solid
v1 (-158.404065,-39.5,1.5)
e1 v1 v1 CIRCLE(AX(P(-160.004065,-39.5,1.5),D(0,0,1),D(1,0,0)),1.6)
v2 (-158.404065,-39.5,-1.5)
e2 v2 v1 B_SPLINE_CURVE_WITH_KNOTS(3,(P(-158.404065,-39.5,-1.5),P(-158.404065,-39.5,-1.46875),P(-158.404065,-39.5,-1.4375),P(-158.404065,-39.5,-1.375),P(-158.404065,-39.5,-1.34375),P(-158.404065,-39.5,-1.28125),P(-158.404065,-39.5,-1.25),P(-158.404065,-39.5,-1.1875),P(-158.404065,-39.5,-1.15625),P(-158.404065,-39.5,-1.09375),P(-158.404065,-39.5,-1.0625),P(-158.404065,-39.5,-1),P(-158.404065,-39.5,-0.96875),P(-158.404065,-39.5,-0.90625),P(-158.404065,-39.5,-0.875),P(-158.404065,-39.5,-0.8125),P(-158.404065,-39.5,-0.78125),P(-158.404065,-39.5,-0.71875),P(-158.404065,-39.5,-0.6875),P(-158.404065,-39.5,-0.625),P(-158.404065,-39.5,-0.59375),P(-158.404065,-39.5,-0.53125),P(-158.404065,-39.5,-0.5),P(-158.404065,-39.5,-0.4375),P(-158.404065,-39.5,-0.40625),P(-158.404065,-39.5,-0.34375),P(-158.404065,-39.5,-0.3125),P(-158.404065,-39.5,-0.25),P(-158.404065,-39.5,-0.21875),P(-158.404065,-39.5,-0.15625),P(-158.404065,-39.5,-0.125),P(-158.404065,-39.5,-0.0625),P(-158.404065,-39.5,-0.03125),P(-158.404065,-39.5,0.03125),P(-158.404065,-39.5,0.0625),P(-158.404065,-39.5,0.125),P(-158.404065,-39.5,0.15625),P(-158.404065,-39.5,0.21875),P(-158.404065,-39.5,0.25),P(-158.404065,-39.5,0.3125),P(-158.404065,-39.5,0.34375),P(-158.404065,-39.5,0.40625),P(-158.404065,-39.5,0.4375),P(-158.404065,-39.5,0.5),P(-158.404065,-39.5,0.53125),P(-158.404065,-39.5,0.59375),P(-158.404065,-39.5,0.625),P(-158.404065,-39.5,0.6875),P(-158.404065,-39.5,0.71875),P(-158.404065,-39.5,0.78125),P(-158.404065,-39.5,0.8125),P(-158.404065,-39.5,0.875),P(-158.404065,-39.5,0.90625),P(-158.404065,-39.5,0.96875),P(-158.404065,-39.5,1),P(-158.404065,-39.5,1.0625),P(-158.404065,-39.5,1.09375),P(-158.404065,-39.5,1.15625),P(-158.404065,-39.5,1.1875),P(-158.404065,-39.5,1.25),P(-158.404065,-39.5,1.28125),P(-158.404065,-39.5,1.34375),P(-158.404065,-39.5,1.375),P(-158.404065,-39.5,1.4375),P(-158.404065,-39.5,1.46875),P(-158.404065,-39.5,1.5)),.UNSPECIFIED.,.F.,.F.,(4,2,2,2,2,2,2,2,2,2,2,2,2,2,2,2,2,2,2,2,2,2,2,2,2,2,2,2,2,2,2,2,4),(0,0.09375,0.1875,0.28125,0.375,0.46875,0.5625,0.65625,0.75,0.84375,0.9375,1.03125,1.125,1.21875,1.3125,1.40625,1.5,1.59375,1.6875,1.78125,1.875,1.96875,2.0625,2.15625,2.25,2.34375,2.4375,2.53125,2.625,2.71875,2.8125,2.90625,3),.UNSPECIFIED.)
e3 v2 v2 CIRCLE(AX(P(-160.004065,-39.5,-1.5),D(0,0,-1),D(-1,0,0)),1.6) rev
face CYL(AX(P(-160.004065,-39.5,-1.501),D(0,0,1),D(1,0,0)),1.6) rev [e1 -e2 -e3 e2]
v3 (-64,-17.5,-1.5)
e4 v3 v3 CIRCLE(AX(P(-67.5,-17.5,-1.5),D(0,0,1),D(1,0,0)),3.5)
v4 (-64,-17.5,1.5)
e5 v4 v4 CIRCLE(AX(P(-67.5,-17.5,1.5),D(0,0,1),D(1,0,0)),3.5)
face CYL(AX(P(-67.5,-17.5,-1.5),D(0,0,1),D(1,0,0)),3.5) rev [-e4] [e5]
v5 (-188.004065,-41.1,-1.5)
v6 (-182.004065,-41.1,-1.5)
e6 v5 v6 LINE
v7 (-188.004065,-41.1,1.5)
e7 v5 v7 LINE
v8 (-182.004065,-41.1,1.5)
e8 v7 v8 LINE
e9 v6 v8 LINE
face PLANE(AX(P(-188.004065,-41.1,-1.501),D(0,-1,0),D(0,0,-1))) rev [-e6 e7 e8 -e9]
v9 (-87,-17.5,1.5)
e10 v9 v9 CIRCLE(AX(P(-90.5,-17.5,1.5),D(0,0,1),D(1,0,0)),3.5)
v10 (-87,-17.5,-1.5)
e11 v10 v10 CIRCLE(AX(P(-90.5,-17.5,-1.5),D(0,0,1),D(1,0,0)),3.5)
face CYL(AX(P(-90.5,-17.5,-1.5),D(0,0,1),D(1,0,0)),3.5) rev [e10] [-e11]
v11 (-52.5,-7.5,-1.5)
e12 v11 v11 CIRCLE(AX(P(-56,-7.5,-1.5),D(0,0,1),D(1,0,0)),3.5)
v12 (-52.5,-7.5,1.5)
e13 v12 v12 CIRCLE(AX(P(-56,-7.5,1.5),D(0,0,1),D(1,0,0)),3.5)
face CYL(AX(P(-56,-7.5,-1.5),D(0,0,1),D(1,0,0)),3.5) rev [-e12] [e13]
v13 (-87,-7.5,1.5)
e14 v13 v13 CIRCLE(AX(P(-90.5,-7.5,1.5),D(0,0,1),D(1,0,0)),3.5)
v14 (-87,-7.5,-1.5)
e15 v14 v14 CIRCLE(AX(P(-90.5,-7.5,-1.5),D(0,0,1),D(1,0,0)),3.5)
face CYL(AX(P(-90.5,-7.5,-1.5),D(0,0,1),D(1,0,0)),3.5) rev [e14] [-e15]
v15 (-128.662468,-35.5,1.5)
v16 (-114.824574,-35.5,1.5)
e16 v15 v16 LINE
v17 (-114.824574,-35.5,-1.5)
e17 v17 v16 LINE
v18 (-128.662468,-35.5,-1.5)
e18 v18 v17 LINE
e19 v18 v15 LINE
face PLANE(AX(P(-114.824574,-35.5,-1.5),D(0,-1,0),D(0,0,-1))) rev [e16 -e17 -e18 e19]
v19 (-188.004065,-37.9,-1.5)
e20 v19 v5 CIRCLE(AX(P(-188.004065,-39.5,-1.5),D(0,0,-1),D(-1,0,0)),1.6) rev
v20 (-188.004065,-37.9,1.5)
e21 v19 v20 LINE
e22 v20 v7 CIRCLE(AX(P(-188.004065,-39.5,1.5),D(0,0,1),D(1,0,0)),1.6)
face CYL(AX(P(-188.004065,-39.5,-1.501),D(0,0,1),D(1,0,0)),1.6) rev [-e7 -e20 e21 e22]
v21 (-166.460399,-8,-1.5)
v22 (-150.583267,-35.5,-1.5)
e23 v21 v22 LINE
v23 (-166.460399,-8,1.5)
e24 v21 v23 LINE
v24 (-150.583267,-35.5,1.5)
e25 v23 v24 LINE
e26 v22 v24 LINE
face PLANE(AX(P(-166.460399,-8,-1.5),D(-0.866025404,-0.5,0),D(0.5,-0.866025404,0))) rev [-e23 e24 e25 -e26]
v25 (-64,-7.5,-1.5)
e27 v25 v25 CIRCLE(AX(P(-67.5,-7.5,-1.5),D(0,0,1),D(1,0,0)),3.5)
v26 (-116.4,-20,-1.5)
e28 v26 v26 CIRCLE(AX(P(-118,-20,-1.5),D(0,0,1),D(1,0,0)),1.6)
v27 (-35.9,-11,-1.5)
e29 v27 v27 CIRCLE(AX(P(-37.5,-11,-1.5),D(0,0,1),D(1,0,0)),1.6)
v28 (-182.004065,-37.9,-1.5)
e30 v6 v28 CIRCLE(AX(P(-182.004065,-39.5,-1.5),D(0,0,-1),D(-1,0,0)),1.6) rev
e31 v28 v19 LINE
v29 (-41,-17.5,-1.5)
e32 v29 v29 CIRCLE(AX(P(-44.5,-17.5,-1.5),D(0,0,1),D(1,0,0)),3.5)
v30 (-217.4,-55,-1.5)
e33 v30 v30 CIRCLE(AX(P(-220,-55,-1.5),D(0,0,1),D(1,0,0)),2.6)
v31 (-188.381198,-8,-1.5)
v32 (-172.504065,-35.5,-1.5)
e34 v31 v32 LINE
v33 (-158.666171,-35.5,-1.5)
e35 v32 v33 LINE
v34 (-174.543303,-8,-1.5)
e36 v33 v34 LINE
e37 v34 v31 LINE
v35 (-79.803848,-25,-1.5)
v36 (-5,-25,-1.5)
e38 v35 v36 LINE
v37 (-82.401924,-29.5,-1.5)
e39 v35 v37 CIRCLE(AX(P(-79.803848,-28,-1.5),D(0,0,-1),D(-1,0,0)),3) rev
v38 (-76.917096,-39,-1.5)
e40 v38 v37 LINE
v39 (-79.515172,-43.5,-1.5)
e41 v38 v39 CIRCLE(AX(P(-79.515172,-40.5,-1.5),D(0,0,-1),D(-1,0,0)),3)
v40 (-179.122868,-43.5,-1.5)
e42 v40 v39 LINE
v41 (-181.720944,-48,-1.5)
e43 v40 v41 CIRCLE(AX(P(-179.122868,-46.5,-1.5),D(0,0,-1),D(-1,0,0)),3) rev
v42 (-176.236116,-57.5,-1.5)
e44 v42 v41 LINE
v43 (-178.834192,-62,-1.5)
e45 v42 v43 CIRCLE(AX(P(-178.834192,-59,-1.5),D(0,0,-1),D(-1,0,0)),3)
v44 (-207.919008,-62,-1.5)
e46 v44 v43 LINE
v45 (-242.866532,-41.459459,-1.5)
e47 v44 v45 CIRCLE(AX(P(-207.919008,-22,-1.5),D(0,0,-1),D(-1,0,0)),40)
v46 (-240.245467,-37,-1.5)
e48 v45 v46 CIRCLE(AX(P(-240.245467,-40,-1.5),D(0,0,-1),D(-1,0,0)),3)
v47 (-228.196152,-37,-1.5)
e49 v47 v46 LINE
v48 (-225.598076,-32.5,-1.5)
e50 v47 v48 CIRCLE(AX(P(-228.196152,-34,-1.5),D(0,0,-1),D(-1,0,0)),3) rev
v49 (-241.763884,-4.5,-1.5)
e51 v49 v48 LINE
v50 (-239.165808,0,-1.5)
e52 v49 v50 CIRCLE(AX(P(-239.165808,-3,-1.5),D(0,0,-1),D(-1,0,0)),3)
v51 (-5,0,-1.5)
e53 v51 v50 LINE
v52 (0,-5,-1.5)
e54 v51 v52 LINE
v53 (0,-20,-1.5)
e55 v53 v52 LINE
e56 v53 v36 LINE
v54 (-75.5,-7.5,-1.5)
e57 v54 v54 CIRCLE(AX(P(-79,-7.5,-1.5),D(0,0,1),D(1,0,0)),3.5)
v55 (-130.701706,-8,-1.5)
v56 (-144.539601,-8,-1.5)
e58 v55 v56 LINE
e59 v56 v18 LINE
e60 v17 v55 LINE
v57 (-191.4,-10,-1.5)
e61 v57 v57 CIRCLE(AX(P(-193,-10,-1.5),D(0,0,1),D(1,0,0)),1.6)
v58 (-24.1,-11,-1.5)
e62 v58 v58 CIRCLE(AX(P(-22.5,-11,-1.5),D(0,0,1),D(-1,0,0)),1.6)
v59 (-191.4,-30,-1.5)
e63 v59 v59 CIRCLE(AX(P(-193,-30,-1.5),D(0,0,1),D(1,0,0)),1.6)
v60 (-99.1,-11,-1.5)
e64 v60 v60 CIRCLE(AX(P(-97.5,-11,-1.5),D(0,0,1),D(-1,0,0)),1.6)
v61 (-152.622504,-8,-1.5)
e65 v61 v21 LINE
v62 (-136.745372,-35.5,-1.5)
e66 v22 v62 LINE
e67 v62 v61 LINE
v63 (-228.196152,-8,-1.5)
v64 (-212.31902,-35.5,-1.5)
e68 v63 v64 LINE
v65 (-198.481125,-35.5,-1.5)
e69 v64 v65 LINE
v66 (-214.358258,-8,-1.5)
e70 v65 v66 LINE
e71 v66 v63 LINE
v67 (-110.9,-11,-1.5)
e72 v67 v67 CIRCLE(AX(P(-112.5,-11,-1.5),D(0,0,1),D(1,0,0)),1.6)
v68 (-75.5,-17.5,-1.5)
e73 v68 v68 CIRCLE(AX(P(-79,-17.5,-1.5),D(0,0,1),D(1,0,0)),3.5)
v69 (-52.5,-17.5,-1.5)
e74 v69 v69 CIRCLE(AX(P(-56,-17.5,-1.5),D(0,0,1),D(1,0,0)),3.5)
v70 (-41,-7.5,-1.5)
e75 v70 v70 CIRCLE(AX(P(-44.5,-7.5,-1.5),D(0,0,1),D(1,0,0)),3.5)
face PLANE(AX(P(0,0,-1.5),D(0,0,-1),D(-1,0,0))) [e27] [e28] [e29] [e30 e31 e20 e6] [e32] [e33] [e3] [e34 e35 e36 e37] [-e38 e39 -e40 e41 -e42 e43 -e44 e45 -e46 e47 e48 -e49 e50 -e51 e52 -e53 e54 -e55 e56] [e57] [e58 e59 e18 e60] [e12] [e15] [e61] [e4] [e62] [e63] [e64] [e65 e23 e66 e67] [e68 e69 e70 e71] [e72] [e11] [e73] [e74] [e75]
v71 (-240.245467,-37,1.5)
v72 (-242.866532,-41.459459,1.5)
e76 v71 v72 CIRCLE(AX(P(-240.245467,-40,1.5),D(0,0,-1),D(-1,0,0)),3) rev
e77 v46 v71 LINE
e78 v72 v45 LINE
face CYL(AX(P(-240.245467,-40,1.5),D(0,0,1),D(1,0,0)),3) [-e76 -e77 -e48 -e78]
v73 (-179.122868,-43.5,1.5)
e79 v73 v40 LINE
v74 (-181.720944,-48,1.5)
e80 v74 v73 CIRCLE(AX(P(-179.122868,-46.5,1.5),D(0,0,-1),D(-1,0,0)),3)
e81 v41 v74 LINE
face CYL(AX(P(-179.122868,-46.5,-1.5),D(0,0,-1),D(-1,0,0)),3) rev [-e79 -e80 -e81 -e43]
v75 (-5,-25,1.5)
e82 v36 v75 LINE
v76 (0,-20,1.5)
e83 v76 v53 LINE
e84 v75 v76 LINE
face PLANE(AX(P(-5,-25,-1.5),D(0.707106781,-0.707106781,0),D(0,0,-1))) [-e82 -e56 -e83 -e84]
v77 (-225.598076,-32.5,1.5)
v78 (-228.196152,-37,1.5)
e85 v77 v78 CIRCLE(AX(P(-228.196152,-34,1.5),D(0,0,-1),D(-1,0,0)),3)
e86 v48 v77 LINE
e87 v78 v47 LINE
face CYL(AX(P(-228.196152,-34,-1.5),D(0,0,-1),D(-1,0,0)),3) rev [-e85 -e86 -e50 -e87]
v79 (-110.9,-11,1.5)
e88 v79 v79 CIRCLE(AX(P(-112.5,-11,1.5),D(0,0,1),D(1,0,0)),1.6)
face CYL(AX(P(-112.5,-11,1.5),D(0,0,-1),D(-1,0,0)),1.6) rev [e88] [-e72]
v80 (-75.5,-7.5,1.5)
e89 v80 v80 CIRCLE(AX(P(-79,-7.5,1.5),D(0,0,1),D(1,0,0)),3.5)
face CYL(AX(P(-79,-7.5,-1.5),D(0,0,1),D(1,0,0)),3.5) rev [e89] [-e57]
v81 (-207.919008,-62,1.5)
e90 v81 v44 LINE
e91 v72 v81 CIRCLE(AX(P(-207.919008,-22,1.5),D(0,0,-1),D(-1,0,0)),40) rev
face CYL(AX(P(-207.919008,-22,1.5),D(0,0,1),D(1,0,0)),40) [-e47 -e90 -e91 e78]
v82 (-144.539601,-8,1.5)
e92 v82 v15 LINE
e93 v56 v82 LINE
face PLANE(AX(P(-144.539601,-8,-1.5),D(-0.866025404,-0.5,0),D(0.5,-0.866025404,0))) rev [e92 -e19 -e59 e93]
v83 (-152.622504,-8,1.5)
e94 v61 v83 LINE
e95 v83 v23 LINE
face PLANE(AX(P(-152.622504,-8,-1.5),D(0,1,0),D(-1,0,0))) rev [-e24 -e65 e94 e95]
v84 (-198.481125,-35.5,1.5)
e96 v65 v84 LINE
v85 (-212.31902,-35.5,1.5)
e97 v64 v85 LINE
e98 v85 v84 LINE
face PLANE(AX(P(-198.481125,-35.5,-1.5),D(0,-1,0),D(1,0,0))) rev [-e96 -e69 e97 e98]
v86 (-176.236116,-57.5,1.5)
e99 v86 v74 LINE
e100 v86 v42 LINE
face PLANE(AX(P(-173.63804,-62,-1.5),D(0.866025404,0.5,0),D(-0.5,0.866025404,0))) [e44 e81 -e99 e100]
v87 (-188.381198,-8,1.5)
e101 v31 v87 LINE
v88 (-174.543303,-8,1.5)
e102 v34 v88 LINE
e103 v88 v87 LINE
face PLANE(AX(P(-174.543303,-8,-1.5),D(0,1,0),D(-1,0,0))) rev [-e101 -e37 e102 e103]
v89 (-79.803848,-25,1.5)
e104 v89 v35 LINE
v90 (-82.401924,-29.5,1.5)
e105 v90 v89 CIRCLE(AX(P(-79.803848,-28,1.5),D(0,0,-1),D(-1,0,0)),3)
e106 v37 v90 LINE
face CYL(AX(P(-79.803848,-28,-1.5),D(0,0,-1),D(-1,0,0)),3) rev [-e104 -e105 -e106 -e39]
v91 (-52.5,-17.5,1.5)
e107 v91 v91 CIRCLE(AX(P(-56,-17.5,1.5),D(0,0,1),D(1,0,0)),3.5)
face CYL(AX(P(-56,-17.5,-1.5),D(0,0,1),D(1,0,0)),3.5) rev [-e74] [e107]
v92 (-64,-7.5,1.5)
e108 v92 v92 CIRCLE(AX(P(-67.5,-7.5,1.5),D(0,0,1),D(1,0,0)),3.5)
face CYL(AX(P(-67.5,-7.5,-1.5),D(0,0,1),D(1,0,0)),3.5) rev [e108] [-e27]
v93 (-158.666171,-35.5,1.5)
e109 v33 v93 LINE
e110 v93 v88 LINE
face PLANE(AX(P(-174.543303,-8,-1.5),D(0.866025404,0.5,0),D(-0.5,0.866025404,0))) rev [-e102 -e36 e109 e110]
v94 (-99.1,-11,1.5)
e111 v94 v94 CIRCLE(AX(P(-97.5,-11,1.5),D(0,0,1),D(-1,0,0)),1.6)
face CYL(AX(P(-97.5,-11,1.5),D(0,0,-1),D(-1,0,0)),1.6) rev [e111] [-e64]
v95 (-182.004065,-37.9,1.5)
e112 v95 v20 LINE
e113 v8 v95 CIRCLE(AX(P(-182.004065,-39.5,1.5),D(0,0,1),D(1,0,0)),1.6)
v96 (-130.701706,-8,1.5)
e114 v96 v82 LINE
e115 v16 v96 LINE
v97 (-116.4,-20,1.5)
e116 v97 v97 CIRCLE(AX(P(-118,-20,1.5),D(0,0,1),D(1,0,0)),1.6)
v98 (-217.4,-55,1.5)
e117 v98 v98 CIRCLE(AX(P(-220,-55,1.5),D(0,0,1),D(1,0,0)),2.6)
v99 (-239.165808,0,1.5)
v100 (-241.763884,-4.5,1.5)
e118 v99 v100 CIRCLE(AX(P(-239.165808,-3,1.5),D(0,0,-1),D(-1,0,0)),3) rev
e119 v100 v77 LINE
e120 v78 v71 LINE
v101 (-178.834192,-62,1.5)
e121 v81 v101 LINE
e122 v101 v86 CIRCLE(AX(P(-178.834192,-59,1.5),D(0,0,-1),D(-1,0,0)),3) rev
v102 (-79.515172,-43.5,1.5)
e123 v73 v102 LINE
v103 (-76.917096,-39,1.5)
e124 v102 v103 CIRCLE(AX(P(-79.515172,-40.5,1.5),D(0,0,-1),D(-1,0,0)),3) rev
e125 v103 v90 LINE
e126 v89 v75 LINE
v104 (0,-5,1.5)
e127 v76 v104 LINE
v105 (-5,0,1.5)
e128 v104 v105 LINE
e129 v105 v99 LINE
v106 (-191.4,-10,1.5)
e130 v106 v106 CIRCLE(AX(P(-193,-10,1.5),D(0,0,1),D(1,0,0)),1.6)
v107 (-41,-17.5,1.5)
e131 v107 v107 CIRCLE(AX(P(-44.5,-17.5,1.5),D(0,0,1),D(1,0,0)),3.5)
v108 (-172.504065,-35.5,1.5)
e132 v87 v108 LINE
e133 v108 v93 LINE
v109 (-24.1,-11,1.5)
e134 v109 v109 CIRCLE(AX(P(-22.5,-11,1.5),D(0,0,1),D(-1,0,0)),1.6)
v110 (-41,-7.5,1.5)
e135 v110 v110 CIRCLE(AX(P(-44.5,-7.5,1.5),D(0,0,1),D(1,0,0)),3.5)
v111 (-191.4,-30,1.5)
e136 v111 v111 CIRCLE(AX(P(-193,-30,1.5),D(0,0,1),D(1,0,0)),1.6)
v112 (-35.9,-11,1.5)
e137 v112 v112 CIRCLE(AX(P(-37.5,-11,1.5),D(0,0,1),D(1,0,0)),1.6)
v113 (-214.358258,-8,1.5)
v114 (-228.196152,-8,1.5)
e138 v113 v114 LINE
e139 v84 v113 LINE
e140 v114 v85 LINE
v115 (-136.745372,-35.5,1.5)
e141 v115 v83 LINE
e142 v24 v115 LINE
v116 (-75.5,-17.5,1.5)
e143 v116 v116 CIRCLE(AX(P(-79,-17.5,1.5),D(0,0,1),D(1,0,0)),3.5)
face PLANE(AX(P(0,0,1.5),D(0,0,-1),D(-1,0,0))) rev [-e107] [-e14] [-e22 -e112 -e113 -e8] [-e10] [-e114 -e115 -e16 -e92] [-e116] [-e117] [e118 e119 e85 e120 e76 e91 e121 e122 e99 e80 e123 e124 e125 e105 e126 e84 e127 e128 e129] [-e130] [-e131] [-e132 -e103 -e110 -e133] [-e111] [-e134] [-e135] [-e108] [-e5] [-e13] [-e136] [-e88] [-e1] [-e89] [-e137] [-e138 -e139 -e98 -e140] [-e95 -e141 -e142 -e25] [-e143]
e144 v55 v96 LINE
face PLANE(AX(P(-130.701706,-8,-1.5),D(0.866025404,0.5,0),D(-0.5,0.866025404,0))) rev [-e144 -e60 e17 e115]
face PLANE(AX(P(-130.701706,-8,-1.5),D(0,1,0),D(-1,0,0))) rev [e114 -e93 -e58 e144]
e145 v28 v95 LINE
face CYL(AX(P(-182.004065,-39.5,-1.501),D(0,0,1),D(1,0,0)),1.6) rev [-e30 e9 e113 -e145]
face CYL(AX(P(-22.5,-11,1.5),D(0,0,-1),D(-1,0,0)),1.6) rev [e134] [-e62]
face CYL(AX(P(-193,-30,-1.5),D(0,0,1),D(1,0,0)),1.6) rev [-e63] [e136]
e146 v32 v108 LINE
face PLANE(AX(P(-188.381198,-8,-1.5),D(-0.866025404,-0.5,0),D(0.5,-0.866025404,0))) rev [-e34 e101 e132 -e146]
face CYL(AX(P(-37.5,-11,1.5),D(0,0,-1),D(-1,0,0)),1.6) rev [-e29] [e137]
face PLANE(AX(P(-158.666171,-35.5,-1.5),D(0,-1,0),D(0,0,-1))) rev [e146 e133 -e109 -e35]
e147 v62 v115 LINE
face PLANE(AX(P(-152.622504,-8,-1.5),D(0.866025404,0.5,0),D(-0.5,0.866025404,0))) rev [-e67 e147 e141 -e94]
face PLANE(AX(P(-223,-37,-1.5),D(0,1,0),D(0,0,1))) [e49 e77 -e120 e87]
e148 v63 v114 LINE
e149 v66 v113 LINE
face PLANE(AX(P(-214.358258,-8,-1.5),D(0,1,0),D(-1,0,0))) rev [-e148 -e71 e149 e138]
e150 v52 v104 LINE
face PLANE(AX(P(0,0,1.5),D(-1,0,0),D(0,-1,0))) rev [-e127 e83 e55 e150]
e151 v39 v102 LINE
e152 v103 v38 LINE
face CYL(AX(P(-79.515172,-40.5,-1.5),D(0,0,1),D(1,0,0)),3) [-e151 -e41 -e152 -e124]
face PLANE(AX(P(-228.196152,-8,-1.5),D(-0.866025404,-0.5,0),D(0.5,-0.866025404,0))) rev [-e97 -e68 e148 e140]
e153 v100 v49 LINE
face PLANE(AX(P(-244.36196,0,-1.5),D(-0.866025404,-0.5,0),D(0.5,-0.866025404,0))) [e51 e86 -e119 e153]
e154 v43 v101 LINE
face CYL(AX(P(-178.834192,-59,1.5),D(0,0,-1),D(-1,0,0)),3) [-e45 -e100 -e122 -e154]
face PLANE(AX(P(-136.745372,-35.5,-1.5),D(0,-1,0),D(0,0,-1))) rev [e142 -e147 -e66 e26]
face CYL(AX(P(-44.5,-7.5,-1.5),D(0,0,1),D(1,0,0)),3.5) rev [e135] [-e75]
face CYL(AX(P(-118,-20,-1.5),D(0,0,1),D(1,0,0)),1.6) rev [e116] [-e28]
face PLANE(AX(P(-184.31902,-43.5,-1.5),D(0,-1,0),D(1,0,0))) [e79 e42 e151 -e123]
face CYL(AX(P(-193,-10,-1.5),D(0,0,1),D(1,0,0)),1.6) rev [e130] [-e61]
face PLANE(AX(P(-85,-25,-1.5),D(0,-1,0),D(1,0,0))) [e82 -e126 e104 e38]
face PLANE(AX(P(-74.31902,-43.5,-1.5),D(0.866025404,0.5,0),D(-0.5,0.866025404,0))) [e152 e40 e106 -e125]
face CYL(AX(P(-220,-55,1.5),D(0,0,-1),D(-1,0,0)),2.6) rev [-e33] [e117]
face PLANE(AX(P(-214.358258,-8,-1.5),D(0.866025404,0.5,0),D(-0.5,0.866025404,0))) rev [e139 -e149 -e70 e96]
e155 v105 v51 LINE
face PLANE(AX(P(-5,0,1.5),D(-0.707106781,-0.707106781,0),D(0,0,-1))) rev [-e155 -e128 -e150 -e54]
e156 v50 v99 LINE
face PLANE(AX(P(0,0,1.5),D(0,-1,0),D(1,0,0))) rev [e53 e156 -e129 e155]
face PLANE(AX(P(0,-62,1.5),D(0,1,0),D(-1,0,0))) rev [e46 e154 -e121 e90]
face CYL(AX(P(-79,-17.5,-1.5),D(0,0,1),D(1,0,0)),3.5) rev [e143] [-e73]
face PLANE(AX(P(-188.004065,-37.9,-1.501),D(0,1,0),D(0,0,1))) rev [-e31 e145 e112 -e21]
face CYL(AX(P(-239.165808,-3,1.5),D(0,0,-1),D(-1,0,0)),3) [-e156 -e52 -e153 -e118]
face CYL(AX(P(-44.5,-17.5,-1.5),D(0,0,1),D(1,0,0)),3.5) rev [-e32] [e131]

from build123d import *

# Parameters (mm, degrees)
SKETCH_1_W          = 245
SKETCH_1_H          = 62
SKETCH_1_R          = 1.6
SKETCH_1_R_2        = 2.6
EXTRUDE_1_DEPTH     = 1.5
SKETCH_2_R          = 1.6
CUT_EXTRUDE_1_DEPTH = 253.740974122
SKETCH_3_OUTSIDE_W  = 297.548
SKETCH_3_OUTSIDE_H  = 114.548
CUT_EXTRUDE_2_DEPTH = 3
FILLET_1_R          = 40
FILLET_2_R          = 3
CHAMFER_1_SIZE      = 5
SKETCH_4_R          = 3.5
CUT_EXTRUDE_3_DEPTH = 252.040549253
CUT_EXTRUDE_4_REACH = 253.041
SKETCH_5_R          = 1.6


with BuildPart() as part:
    # 草图1 → 凸台-拉伸1 (new, symmetric)
    with BuildSketch(Plane.XY):
        with Locations((-122.5, -31)):
            Rectangle(SKETCH_1_W, SKETCH_1_H)
        with Locations((-112.5, -11)):
            Circle(SKETCH_1_R, mode=Mode.SUBTRACT)
        with Locations((-37.5, -11)):
            Circle(SKETCH_1_R, mode=Mode.SUBTRACT)
        with Locations(Location((-97.5, -11, 0), (0, 0, 180))):
            Circle(SKETCH_1_R, mode=Mode.SUBTRACT)
        with Locations(Location((-22.5, -11, 0), (0, 0, 180))):
            Circle(SKETCH_1_R, mode=Mode.SUBTRACT)
        with Locations((-220, -55)):
            Circle(SKETCH_1_R_2, mode=Mode.SUBTRACT)
    extrude(amount=EXTRUDE_1_DEPTH, both=True)

    # 草图2 → 切除-拉伸1 (cut, through all)
    with BuildSketch(Plane.XY.offset(1.5)):
        with Locations((-193, -10)):
            Circle(SKETCH_2_R)
        with Locations((-193, -30)):
            Circle(SKETCH_2_R)
        with Locations((-118, -20)):
            Circle(SKETCH_2_R)
    extrude(amount=-CUT_EXTRUDE_1_DEPTH, mode=Mode.SUBTRACT)

    # 草图3 outside → 切除-拉伸2 (cut)
    with BuildSketch(Plane.XY.offset(1.5)):
        with Locations((-122.5, -31)):
            Rectangle(SKETCH_3_OUTSIDE_W, SKETCH_3_OUTSIDE_H)
        Polygon((0, 0), (-244.36195996, 0), (-223, -37), (-245, -37), (-245, -62), (-173.63804004, -62), (-184.31902002, -43.5), (-74.31902002, -43.5), (-85, -25), (0, -25), align=None, mode=Mode.SUBTRACT)
    extrude(amount=-CUT_EXTRUDE_2_DEPTH, mode=Mode.SUBTRACT)

    # 圆角1
    # the kernel refuses this fillet: 40 mm, written as the material it takes off along each edge
    with BuildSketch(Plane(origin=(-245, -62, -94.202481089), x_dir=(1, 0, 0), z_dir=(0, 0, 1))) as fillet_1_piece_1:
        with BuildLine():
            CenterArc((37.080992435, 40), FILLET_1_R, 202.024312837, 67.975687163)
            Line((0, 25), (-0.741619849, 24.7))
            ThreePointArc((-0.741619849, 24.7), (-0.8, 12.5), (-0.8, 0))
            Line((-0.8, 0), (0, -0.8))
            Line((0, -0.8), (37.080992435, -0.8))
            Line((37.080992435, -0.8), (37.080992435, 0))
        make_face()
    extrude(amount=188.404962177, mode=Mode.SUBTRACT)

    # 圆角2
    fillet_2_edges = [part.edges().sort_by_distance(p)[0] for p in [
        (-85, -25, 0),
        (-74.31902002, -43.5, 0),
        (-184.31902002, -43.5, 0),
        (-173.63804004, -62, 0),
        (-245, -37, 0),
        (-223, -37, 0),
        (-244.36195996, 0, 0),
    ]]
    fillet(fillet_2_edges, radius=FILLET_2_R)

    # 倒角1
    chamfer_1_edges = [part.edges().sort_by_distance(p)[0] for p in [
        (0, -25, 0),
        (0, 0, 0),
    ]]
    chamfer(chamfer_1_edges, length=CHAMFER_1_SIZE)

    # 草图4 → 切除-拉伸3 (cut, through all)
    with BuildSketch(Plane.XY.offset(1.5)):
        with Locations((-90.5, -7.5)):
            Circle(SKETCH_4_R)
        with Locations((-79, -7.5)):
            Circle(SKETCH_4_R)
        with Locations((-67.5, -7.5)):
            Circle(SKETCH_4_R)
        with Locations((-56, -7.5)):
            Circle(SKETCH_4_R)
        with Locations((-44.5, -7.5)):
            Circle(SKETCH_4_R)
        with Locations((-79, -17.5)):
            Circle(SKETCH_4_R)
        with Locations((-67.5, -17.5)):
            Circle(SKETCH_4_R)
        with Locations((-56, -17.5)):
            Circle(SKETCH_4_R)
        with Locations((-44.5, -17.5)):
            Circle(SKETCH_4_R)
        with Locations((-90.5, -17.5)):
            Circle(SKETCH_4_R)
        Polygon((-174.543303051, -8), (-188.381197846, -8), (-172.504065444, -35.5), (-158.666170648, -35.5), align=None)
        Polygon((-152.622504486, -8), (-166.460399282, -8), (-150.583266879, -35.5), (-136.745372084, -35.5), align=None)
        Polygon((-130.701705922, -8), (-144.539600718, -8), (-128.662468315, -35.5), (-114.824573519, -35.5), align=None)
        Polygon((-214.358257627, -8), (-228.196152423, -8), (-212.31902002, -35.5), (-198.481125224, -35.5), align=None)
    extrude(amount=-CUT_EXTRUDE_3_DEPTH, mode=Mode.SUBTRACT)

    # 草图5 → 切除-拉伸4 (cut, up to next)
    with BuildSketch(Plane.XY.offset(1.5), mode=Mode.PRIVATE) as cut_extrude_4_sk1:
        with Locations((-160.004065444, -39.5)):
            Circle(SKETCH_5_R)
    cut_extrude_4_tool1 = extrude(cut_extrude_4_sk1.sketch, amount=-CUT_EXTRUDE_4_REACH, mode=Mode.PRIVATE) & part.part
    # 草图5 → 切除-拉伸4 (cut, up to next)
    with BuildSketch(Plane.XY.offset(1.5), mode=Mode.PRIVATE) as cut_extrude_4_sk2:
        with BuildLine():
            Line((-188.004065444, -37.9), (-182.004065444, -37.9))
            ThreePointArc((-182.004065444, -37.9), (-180.404065444, -39.5), (-182.004065444, -41.1))
            Line((-182.004065444, -41.1), (-188.004065444, -41.1))
            ThreePointArc((-188.004065444, -41.1), (-189.604065444, -39.5), (-188.004065444, -37.9))
        make_face()
    cut_extrude_4_tool2 = extrude(cut_extrude_4_sk2.sketch, amount=-CUT_EXTRUDE_4_REACH, mode=Mode.PRIVATE) & part.part
    add(cut_extrude_4_tool1.solids().sort_by_distance((-160.004065, -39.5, 1.5))[0], mode=Mode.SUBTRACT)
    add(cut_extrude_4_tool2.solids().sort_by_distance((-185.004065, -39.5, 1.5))[0], mode=Mode.SUBTRACT)


solid = part.part
